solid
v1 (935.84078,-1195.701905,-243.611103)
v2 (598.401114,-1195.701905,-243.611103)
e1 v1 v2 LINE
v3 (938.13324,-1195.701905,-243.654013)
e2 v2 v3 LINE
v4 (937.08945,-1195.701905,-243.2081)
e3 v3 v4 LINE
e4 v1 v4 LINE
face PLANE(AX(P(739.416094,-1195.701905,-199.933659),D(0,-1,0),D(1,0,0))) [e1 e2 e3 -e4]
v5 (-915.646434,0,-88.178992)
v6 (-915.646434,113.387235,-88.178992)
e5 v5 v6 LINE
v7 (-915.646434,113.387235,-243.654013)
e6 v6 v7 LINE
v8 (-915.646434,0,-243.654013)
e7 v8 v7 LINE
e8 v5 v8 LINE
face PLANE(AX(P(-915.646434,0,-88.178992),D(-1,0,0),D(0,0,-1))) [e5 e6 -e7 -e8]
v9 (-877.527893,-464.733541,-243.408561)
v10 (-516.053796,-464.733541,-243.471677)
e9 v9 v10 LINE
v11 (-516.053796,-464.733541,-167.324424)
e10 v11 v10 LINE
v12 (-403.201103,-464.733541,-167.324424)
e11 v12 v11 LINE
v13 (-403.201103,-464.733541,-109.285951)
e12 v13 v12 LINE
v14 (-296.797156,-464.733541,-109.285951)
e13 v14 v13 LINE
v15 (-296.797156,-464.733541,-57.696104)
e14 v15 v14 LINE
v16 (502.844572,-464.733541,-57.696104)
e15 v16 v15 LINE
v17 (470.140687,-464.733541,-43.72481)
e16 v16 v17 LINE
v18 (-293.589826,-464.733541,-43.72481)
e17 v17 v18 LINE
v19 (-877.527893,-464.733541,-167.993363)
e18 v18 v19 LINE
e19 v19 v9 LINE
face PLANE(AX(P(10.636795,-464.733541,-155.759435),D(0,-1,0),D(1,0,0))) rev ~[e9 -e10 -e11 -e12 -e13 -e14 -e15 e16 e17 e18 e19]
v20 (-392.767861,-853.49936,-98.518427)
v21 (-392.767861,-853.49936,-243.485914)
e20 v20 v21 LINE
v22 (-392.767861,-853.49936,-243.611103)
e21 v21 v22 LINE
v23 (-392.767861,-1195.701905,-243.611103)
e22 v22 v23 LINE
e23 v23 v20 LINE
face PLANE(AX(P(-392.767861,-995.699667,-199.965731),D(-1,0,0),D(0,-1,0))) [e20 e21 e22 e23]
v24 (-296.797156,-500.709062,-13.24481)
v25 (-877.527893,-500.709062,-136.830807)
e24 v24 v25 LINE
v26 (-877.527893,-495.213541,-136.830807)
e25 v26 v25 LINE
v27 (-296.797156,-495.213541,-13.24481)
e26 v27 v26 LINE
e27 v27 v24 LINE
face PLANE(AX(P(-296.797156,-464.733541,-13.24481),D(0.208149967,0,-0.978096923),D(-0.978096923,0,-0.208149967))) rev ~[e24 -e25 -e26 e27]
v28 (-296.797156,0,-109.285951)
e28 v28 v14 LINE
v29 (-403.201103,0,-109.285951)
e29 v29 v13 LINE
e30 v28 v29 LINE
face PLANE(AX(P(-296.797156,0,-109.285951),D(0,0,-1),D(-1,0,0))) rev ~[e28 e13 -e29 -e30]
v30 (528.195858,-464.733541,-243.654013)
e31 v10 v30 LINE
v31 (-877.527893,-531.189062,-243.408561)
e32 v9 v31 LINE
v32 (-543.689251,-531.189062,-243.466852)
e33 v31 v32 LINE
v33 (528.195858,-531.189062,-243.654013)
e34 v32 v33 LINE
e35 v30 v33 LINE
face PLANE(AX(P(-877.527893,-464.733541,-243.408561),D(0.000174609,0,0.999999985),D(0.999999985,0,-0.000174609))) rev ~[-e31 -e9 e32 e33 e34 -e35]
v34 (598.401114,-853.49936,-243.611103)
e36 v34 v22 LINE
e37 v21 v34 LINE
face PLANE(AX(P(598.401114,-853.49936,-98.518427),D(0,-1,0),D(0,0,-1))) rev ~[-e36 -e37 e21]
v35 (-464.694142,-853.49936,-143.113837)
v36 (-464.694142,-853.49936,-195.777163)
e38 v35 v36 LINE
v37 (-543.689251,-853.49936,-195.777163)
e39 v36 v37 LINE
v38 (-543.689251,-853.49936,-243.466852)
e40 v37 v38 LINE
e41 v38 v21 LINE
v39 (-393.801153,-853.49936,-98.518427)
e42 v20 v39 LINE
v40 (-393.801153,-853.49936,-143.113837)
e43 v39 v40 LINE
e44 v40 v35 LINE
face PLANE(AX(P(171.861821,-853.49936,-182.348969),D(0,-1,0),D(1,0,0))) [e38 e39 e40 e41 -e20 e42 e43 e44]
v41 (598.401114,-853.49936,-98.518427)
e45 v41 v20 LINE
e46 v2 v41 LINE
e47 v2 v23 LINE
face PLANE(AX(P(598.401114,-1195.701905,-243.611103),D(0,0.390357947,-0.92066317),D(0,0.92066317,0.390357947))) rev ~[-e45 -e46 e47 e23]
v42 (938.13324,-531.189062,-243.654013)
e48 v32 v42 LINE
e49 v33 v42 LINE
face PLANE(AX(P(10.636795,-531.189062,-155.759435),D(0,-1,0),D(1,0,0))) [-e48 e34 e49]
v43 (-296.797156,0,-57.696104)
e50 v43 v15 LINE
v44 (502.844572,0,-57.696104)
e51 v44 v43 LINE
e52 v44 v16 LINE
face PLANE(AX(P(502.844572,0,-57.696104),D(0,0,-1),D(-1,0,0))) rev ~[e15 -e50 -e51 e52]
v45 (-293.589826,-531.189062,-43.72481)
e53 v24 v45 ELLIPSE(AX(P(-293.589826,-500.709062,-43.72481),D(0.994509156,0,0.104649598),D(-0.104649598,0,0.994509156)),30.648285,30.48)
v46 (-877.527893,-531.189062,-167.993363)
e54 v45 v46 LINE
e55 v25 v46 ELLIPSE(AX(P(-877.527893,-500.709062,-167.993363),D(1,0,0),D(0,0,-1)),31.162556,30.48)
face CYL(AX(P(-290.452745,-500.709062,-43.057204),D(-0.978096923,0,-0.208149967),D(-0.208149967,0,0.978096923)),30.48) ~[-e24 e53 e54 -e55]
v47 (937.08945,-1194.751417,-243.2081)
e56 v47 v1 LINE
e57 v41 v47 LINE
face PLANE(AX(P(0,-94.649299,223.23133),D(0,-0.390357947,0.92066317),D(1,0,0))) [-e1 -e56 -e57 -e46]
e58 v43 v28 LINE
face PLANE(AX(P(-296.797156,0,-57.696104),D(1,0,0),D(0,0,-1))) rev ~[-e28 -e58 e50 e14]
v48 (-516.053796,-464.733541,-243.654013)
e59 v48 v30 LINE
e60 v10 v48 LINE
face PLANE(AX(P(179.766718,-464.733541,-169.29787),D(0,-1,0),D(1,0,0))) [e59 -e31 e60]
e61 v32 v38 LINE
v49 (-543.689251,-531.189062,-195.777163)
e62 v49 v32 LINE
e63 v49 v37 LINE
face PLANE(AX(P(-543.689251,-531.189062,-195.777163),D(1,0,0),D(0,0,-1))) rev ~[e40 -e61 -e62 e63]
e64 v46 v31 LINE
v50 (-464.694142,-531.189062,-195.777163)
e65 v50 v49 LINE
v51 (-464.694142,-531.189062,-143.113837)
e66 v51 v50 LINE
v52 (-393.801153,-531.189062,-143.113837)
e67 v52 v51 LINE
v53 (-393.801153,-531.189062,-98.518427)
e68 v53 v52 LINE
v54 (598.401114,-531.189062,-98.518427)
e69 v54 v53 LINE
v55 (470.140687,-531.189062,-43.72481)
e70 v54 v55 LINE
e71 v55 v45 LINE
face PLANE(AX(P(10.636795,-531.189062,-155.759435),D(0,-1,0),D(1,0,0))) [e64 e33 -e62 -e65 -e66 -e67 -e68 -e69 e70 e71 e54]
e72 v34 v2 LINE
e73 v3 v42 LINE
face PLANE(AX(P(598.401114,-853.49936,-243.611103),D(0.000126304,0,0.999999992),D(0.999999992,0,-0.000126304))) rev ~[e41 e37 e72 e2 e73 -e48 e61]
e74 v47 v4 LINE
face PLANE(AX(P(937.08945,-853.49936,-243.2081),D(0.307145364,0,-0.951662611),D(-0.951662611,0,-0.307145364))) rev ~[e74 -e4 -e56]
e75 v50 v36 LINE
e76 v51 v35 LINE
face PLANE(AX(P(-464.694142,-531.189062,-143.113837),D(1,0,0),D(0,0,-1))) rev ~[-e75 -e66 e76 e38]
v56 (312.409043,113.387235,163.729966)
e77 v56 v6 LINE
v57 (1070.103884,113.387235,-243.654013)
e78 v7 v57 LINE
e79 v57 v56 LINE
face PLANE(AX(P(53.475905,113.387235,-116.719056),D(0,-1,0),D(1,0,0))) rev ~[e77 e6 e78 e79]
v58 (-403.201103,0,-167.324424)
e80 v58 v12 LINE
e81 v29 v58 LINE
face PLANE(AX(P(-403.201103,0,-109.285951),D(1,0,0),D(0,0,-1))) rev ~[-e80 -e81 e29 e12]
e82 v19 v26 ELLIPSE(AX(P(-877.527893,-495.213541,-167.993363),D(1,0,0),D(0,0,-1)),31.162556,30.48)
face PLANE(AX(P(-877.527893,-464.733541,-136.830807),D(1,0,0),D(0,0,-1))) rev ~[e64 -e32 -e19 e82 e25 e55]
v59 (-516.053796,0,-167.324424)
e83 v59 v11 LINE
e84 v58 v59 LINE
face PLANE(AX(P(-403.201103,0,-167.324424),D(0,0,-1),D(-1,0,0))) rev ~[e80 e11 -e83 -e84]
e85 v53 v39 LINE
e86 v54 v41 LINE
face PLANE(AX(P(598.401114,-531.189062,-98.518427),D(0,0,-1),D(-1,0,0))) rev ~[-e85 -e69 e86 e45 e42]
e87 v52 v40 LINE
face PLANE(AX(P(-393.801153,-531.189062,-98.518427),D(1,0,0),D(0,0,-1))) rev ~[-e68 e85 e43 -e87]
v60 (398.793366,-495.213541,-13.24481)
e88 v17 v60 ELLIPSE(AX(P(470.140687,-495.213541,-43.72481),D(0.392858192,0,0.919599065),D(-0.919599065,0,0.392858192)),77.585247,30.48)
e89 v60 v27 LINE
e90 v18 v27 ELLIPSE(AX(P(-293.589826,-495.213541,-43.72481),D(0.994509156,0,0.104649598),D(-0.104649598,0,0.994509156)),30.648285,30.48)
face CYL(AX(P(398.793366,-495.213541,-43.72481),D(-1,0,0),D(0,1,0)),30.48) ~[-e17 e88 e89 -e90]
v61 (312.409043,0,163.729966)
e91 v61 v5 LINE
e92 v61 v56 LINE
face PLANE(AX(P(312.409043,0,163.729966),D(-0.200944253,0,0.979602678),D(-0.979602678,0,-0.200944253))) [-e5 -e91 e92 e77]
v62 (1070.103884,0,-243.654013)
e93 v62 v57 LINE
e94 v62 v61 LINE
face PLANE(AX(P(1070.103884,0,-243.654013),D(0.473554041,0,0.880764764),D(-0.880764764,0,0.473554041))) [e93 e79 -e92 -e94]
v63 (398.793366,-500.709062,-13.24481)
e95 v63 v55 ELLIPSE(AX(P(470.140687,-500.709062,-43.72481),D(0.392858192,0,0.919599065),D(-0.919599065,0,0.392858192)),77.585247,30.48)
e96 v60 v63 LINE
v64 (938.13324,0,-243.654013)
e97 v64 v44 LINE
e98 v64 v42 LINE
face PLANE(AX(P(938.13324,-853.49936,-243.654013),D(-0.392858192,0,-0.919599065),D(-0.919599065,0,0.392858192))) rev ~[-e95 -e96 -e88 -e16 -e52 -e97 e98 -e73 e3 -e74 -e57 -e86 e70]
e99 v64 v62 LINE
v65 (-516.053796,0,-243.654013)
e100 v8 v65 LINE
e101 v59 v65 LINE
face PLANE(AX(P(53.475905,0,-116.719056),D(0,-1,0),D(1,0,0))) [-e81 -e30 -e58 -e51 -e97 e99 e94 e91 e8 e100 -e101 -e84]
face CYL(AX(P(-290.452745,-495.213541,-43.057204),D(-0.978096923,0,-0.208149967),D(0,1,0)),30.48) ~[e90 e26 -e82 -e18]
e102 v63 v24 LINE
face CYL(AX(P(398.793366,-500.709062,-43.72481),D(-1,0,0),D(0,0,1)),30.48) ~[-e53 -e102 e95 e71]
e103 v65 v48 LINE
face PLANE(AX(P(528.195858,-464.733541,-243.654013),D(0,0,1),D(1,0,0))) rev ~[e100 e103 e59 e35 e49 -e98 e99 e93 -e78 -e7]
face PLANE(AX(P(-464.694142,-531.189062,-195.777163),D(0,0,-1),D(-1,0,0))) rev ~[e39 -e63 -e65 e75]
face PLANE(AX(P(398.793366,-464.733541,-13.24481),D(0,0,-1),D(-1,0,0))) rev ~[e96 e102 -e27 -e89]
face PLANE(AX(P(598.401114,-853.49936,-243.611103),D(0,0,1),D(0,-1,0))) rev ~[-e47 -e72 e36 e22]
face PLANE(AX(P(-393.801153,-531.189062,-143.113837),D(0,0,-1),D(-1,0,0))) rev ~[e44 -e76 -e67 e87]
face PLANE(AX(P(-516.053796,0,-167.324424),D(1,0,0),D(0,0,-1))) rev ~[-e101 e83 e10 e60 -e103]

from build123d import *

# Parameters (mm, degrees)
F1_DEPTH     = 113.387234509
F3_DEPTH     = 464.7335410118
F5_DEPTH     = 66.4555206895
F6_R         = 30.48
F8_DEPTH     = 322.3102986813
F10_DEPTH    = 342.2025442123
F12_DEPTH    = 991.1689758301
F13_T4_DEPTH = 1291.048119331


# Not quite as in the source:
# - a fillet or chamfer that OpenCascade refuses, or shapes differently, is made with other operations: its cross-section is extruded or revolved along the edge and cut away or added


with BuildPart() as f1:
    # F0 (on Front) → F1 (new body)
    with BuildSketch(Plane.XZ):
        Polygon((-915.6464338303, -243.6540126801), (1070.1038837433, -243.6540126801), (312.4090433121, 163.7299656868), (-915.6464338303, -88.1789922714), align=None)
    extrude(amount=-F1_DEPTH)

    # F2 (on face) → F3 (join)
    with BuildSketch(Plane.XZ):
        Polygon((-516.0537958145, -243.6540126801), (938.1332397461, -243.6540126801), (502.8445720673, -57.6961040497), (-296.7971563339, -57.6961040497), (-296.7971563339, -109.2859506607), (-403.2011032104, -109.2859506607), (-403.2011032104, -167.32442379), (-516.0537958145, -167.32442379), align=None)
    extrude(amount=F3_DEPTH)

    # F4 (on face) → F5 (join)
    with BuildSketch(Plane.XZ.offset(464.7335410118)):
        Polygon((528.1958580017, -243.6540126801), (938.1332397461, -243.6540126801), (398.7933658153, -13.2448096747), (-296.7971563339, -13.2448096747), (-877.5278925896, -136.8308067322), (-877.5278925896, -243.4085607529), align=None)
    extrude(amount=F5_DEPTH)

    # F6
    f6_edges = [f1.edges().sort_by_distance(p)[0] for p in [
        (50.998105, -464.733541, -13.24481),
        (50.998105, -531.189062, -13.24481),
        (-587.162524, -531.189062, -75.037808),
        (-587.162524, -464.733541, -75.037808),
    ]]
    fillet(f6_edges, radius=F6_R)

    # F7 (on face) → F8 (join)
    with BuildSketch(Plane.XZ.offset(531.1890617013)):
        Polygon((-543.689250946, -243.4668519626), (938.1332397461, -243.6540126801), (598.4011143715, -98.5184274462), (-393.8011527061, -98.5184274462), (-393.8011527061, -143.1138366461), (-464.6941423416, -143.1138366461), (-464.6941423416, -195.7771629095), (-543.689250946, -195.7771629095), align=None)
    extrude(amount=F8_DEPTH)

    # F9 (on face) → F10 (join)
    with BuildSketch(Plane.XZ.offset(853.4993603826)):
        Polygon((938.1332397461, -243.6540126801), (598.4011143715, -98.5184274462), (598.4011143715, -243.6111030139), align=None)
    extrude(amount=F10_DEPTH)

    # F11 (on face) → F12 (join)
    with BuildSketch(Plane(origin=(598.4011143715, 0, 0), x_dir=(0, -1, 0), z_dir=(-1, 0, 0))):
        Polygon((853.4993603826, -98.5184274462), (853.4993603826, -243.6111030139), (1195.7019045949, -243.6111030139), align=None)
    extrude(amount=F12_DEPTH)

    # F13: chamfer of 254 x 368.3 on 1 edges, made by hand


with BuildPart() as f13_tool2:
    # F13_s3 → F13_t4 (new body)
    with BuildSketch(Plane.XZ.offset(853.4993603826)):
        Polygon((937.089450141, -243.2080995506), (598.4011143715, -352.5184274462), (598.4011143715, -98.5184274462), align=None)
    extrude(amount=F13_T4_DEPTH)

    split(bisect_by=Plane(origin=(0, -94.6492992071, 223.2313303883), x_dir=(1, 0, 0), z_dir=(0, -0.3903579472, 0.9206631703)), keep=Keep.TOP)


with BuildPart() as f1_1:
    add(f1.part)

    # F13_t1: cut F13_tool2
    add(f13_tool2.part, mode=Mode.SUBTRACT)


solid = f1_1.part
